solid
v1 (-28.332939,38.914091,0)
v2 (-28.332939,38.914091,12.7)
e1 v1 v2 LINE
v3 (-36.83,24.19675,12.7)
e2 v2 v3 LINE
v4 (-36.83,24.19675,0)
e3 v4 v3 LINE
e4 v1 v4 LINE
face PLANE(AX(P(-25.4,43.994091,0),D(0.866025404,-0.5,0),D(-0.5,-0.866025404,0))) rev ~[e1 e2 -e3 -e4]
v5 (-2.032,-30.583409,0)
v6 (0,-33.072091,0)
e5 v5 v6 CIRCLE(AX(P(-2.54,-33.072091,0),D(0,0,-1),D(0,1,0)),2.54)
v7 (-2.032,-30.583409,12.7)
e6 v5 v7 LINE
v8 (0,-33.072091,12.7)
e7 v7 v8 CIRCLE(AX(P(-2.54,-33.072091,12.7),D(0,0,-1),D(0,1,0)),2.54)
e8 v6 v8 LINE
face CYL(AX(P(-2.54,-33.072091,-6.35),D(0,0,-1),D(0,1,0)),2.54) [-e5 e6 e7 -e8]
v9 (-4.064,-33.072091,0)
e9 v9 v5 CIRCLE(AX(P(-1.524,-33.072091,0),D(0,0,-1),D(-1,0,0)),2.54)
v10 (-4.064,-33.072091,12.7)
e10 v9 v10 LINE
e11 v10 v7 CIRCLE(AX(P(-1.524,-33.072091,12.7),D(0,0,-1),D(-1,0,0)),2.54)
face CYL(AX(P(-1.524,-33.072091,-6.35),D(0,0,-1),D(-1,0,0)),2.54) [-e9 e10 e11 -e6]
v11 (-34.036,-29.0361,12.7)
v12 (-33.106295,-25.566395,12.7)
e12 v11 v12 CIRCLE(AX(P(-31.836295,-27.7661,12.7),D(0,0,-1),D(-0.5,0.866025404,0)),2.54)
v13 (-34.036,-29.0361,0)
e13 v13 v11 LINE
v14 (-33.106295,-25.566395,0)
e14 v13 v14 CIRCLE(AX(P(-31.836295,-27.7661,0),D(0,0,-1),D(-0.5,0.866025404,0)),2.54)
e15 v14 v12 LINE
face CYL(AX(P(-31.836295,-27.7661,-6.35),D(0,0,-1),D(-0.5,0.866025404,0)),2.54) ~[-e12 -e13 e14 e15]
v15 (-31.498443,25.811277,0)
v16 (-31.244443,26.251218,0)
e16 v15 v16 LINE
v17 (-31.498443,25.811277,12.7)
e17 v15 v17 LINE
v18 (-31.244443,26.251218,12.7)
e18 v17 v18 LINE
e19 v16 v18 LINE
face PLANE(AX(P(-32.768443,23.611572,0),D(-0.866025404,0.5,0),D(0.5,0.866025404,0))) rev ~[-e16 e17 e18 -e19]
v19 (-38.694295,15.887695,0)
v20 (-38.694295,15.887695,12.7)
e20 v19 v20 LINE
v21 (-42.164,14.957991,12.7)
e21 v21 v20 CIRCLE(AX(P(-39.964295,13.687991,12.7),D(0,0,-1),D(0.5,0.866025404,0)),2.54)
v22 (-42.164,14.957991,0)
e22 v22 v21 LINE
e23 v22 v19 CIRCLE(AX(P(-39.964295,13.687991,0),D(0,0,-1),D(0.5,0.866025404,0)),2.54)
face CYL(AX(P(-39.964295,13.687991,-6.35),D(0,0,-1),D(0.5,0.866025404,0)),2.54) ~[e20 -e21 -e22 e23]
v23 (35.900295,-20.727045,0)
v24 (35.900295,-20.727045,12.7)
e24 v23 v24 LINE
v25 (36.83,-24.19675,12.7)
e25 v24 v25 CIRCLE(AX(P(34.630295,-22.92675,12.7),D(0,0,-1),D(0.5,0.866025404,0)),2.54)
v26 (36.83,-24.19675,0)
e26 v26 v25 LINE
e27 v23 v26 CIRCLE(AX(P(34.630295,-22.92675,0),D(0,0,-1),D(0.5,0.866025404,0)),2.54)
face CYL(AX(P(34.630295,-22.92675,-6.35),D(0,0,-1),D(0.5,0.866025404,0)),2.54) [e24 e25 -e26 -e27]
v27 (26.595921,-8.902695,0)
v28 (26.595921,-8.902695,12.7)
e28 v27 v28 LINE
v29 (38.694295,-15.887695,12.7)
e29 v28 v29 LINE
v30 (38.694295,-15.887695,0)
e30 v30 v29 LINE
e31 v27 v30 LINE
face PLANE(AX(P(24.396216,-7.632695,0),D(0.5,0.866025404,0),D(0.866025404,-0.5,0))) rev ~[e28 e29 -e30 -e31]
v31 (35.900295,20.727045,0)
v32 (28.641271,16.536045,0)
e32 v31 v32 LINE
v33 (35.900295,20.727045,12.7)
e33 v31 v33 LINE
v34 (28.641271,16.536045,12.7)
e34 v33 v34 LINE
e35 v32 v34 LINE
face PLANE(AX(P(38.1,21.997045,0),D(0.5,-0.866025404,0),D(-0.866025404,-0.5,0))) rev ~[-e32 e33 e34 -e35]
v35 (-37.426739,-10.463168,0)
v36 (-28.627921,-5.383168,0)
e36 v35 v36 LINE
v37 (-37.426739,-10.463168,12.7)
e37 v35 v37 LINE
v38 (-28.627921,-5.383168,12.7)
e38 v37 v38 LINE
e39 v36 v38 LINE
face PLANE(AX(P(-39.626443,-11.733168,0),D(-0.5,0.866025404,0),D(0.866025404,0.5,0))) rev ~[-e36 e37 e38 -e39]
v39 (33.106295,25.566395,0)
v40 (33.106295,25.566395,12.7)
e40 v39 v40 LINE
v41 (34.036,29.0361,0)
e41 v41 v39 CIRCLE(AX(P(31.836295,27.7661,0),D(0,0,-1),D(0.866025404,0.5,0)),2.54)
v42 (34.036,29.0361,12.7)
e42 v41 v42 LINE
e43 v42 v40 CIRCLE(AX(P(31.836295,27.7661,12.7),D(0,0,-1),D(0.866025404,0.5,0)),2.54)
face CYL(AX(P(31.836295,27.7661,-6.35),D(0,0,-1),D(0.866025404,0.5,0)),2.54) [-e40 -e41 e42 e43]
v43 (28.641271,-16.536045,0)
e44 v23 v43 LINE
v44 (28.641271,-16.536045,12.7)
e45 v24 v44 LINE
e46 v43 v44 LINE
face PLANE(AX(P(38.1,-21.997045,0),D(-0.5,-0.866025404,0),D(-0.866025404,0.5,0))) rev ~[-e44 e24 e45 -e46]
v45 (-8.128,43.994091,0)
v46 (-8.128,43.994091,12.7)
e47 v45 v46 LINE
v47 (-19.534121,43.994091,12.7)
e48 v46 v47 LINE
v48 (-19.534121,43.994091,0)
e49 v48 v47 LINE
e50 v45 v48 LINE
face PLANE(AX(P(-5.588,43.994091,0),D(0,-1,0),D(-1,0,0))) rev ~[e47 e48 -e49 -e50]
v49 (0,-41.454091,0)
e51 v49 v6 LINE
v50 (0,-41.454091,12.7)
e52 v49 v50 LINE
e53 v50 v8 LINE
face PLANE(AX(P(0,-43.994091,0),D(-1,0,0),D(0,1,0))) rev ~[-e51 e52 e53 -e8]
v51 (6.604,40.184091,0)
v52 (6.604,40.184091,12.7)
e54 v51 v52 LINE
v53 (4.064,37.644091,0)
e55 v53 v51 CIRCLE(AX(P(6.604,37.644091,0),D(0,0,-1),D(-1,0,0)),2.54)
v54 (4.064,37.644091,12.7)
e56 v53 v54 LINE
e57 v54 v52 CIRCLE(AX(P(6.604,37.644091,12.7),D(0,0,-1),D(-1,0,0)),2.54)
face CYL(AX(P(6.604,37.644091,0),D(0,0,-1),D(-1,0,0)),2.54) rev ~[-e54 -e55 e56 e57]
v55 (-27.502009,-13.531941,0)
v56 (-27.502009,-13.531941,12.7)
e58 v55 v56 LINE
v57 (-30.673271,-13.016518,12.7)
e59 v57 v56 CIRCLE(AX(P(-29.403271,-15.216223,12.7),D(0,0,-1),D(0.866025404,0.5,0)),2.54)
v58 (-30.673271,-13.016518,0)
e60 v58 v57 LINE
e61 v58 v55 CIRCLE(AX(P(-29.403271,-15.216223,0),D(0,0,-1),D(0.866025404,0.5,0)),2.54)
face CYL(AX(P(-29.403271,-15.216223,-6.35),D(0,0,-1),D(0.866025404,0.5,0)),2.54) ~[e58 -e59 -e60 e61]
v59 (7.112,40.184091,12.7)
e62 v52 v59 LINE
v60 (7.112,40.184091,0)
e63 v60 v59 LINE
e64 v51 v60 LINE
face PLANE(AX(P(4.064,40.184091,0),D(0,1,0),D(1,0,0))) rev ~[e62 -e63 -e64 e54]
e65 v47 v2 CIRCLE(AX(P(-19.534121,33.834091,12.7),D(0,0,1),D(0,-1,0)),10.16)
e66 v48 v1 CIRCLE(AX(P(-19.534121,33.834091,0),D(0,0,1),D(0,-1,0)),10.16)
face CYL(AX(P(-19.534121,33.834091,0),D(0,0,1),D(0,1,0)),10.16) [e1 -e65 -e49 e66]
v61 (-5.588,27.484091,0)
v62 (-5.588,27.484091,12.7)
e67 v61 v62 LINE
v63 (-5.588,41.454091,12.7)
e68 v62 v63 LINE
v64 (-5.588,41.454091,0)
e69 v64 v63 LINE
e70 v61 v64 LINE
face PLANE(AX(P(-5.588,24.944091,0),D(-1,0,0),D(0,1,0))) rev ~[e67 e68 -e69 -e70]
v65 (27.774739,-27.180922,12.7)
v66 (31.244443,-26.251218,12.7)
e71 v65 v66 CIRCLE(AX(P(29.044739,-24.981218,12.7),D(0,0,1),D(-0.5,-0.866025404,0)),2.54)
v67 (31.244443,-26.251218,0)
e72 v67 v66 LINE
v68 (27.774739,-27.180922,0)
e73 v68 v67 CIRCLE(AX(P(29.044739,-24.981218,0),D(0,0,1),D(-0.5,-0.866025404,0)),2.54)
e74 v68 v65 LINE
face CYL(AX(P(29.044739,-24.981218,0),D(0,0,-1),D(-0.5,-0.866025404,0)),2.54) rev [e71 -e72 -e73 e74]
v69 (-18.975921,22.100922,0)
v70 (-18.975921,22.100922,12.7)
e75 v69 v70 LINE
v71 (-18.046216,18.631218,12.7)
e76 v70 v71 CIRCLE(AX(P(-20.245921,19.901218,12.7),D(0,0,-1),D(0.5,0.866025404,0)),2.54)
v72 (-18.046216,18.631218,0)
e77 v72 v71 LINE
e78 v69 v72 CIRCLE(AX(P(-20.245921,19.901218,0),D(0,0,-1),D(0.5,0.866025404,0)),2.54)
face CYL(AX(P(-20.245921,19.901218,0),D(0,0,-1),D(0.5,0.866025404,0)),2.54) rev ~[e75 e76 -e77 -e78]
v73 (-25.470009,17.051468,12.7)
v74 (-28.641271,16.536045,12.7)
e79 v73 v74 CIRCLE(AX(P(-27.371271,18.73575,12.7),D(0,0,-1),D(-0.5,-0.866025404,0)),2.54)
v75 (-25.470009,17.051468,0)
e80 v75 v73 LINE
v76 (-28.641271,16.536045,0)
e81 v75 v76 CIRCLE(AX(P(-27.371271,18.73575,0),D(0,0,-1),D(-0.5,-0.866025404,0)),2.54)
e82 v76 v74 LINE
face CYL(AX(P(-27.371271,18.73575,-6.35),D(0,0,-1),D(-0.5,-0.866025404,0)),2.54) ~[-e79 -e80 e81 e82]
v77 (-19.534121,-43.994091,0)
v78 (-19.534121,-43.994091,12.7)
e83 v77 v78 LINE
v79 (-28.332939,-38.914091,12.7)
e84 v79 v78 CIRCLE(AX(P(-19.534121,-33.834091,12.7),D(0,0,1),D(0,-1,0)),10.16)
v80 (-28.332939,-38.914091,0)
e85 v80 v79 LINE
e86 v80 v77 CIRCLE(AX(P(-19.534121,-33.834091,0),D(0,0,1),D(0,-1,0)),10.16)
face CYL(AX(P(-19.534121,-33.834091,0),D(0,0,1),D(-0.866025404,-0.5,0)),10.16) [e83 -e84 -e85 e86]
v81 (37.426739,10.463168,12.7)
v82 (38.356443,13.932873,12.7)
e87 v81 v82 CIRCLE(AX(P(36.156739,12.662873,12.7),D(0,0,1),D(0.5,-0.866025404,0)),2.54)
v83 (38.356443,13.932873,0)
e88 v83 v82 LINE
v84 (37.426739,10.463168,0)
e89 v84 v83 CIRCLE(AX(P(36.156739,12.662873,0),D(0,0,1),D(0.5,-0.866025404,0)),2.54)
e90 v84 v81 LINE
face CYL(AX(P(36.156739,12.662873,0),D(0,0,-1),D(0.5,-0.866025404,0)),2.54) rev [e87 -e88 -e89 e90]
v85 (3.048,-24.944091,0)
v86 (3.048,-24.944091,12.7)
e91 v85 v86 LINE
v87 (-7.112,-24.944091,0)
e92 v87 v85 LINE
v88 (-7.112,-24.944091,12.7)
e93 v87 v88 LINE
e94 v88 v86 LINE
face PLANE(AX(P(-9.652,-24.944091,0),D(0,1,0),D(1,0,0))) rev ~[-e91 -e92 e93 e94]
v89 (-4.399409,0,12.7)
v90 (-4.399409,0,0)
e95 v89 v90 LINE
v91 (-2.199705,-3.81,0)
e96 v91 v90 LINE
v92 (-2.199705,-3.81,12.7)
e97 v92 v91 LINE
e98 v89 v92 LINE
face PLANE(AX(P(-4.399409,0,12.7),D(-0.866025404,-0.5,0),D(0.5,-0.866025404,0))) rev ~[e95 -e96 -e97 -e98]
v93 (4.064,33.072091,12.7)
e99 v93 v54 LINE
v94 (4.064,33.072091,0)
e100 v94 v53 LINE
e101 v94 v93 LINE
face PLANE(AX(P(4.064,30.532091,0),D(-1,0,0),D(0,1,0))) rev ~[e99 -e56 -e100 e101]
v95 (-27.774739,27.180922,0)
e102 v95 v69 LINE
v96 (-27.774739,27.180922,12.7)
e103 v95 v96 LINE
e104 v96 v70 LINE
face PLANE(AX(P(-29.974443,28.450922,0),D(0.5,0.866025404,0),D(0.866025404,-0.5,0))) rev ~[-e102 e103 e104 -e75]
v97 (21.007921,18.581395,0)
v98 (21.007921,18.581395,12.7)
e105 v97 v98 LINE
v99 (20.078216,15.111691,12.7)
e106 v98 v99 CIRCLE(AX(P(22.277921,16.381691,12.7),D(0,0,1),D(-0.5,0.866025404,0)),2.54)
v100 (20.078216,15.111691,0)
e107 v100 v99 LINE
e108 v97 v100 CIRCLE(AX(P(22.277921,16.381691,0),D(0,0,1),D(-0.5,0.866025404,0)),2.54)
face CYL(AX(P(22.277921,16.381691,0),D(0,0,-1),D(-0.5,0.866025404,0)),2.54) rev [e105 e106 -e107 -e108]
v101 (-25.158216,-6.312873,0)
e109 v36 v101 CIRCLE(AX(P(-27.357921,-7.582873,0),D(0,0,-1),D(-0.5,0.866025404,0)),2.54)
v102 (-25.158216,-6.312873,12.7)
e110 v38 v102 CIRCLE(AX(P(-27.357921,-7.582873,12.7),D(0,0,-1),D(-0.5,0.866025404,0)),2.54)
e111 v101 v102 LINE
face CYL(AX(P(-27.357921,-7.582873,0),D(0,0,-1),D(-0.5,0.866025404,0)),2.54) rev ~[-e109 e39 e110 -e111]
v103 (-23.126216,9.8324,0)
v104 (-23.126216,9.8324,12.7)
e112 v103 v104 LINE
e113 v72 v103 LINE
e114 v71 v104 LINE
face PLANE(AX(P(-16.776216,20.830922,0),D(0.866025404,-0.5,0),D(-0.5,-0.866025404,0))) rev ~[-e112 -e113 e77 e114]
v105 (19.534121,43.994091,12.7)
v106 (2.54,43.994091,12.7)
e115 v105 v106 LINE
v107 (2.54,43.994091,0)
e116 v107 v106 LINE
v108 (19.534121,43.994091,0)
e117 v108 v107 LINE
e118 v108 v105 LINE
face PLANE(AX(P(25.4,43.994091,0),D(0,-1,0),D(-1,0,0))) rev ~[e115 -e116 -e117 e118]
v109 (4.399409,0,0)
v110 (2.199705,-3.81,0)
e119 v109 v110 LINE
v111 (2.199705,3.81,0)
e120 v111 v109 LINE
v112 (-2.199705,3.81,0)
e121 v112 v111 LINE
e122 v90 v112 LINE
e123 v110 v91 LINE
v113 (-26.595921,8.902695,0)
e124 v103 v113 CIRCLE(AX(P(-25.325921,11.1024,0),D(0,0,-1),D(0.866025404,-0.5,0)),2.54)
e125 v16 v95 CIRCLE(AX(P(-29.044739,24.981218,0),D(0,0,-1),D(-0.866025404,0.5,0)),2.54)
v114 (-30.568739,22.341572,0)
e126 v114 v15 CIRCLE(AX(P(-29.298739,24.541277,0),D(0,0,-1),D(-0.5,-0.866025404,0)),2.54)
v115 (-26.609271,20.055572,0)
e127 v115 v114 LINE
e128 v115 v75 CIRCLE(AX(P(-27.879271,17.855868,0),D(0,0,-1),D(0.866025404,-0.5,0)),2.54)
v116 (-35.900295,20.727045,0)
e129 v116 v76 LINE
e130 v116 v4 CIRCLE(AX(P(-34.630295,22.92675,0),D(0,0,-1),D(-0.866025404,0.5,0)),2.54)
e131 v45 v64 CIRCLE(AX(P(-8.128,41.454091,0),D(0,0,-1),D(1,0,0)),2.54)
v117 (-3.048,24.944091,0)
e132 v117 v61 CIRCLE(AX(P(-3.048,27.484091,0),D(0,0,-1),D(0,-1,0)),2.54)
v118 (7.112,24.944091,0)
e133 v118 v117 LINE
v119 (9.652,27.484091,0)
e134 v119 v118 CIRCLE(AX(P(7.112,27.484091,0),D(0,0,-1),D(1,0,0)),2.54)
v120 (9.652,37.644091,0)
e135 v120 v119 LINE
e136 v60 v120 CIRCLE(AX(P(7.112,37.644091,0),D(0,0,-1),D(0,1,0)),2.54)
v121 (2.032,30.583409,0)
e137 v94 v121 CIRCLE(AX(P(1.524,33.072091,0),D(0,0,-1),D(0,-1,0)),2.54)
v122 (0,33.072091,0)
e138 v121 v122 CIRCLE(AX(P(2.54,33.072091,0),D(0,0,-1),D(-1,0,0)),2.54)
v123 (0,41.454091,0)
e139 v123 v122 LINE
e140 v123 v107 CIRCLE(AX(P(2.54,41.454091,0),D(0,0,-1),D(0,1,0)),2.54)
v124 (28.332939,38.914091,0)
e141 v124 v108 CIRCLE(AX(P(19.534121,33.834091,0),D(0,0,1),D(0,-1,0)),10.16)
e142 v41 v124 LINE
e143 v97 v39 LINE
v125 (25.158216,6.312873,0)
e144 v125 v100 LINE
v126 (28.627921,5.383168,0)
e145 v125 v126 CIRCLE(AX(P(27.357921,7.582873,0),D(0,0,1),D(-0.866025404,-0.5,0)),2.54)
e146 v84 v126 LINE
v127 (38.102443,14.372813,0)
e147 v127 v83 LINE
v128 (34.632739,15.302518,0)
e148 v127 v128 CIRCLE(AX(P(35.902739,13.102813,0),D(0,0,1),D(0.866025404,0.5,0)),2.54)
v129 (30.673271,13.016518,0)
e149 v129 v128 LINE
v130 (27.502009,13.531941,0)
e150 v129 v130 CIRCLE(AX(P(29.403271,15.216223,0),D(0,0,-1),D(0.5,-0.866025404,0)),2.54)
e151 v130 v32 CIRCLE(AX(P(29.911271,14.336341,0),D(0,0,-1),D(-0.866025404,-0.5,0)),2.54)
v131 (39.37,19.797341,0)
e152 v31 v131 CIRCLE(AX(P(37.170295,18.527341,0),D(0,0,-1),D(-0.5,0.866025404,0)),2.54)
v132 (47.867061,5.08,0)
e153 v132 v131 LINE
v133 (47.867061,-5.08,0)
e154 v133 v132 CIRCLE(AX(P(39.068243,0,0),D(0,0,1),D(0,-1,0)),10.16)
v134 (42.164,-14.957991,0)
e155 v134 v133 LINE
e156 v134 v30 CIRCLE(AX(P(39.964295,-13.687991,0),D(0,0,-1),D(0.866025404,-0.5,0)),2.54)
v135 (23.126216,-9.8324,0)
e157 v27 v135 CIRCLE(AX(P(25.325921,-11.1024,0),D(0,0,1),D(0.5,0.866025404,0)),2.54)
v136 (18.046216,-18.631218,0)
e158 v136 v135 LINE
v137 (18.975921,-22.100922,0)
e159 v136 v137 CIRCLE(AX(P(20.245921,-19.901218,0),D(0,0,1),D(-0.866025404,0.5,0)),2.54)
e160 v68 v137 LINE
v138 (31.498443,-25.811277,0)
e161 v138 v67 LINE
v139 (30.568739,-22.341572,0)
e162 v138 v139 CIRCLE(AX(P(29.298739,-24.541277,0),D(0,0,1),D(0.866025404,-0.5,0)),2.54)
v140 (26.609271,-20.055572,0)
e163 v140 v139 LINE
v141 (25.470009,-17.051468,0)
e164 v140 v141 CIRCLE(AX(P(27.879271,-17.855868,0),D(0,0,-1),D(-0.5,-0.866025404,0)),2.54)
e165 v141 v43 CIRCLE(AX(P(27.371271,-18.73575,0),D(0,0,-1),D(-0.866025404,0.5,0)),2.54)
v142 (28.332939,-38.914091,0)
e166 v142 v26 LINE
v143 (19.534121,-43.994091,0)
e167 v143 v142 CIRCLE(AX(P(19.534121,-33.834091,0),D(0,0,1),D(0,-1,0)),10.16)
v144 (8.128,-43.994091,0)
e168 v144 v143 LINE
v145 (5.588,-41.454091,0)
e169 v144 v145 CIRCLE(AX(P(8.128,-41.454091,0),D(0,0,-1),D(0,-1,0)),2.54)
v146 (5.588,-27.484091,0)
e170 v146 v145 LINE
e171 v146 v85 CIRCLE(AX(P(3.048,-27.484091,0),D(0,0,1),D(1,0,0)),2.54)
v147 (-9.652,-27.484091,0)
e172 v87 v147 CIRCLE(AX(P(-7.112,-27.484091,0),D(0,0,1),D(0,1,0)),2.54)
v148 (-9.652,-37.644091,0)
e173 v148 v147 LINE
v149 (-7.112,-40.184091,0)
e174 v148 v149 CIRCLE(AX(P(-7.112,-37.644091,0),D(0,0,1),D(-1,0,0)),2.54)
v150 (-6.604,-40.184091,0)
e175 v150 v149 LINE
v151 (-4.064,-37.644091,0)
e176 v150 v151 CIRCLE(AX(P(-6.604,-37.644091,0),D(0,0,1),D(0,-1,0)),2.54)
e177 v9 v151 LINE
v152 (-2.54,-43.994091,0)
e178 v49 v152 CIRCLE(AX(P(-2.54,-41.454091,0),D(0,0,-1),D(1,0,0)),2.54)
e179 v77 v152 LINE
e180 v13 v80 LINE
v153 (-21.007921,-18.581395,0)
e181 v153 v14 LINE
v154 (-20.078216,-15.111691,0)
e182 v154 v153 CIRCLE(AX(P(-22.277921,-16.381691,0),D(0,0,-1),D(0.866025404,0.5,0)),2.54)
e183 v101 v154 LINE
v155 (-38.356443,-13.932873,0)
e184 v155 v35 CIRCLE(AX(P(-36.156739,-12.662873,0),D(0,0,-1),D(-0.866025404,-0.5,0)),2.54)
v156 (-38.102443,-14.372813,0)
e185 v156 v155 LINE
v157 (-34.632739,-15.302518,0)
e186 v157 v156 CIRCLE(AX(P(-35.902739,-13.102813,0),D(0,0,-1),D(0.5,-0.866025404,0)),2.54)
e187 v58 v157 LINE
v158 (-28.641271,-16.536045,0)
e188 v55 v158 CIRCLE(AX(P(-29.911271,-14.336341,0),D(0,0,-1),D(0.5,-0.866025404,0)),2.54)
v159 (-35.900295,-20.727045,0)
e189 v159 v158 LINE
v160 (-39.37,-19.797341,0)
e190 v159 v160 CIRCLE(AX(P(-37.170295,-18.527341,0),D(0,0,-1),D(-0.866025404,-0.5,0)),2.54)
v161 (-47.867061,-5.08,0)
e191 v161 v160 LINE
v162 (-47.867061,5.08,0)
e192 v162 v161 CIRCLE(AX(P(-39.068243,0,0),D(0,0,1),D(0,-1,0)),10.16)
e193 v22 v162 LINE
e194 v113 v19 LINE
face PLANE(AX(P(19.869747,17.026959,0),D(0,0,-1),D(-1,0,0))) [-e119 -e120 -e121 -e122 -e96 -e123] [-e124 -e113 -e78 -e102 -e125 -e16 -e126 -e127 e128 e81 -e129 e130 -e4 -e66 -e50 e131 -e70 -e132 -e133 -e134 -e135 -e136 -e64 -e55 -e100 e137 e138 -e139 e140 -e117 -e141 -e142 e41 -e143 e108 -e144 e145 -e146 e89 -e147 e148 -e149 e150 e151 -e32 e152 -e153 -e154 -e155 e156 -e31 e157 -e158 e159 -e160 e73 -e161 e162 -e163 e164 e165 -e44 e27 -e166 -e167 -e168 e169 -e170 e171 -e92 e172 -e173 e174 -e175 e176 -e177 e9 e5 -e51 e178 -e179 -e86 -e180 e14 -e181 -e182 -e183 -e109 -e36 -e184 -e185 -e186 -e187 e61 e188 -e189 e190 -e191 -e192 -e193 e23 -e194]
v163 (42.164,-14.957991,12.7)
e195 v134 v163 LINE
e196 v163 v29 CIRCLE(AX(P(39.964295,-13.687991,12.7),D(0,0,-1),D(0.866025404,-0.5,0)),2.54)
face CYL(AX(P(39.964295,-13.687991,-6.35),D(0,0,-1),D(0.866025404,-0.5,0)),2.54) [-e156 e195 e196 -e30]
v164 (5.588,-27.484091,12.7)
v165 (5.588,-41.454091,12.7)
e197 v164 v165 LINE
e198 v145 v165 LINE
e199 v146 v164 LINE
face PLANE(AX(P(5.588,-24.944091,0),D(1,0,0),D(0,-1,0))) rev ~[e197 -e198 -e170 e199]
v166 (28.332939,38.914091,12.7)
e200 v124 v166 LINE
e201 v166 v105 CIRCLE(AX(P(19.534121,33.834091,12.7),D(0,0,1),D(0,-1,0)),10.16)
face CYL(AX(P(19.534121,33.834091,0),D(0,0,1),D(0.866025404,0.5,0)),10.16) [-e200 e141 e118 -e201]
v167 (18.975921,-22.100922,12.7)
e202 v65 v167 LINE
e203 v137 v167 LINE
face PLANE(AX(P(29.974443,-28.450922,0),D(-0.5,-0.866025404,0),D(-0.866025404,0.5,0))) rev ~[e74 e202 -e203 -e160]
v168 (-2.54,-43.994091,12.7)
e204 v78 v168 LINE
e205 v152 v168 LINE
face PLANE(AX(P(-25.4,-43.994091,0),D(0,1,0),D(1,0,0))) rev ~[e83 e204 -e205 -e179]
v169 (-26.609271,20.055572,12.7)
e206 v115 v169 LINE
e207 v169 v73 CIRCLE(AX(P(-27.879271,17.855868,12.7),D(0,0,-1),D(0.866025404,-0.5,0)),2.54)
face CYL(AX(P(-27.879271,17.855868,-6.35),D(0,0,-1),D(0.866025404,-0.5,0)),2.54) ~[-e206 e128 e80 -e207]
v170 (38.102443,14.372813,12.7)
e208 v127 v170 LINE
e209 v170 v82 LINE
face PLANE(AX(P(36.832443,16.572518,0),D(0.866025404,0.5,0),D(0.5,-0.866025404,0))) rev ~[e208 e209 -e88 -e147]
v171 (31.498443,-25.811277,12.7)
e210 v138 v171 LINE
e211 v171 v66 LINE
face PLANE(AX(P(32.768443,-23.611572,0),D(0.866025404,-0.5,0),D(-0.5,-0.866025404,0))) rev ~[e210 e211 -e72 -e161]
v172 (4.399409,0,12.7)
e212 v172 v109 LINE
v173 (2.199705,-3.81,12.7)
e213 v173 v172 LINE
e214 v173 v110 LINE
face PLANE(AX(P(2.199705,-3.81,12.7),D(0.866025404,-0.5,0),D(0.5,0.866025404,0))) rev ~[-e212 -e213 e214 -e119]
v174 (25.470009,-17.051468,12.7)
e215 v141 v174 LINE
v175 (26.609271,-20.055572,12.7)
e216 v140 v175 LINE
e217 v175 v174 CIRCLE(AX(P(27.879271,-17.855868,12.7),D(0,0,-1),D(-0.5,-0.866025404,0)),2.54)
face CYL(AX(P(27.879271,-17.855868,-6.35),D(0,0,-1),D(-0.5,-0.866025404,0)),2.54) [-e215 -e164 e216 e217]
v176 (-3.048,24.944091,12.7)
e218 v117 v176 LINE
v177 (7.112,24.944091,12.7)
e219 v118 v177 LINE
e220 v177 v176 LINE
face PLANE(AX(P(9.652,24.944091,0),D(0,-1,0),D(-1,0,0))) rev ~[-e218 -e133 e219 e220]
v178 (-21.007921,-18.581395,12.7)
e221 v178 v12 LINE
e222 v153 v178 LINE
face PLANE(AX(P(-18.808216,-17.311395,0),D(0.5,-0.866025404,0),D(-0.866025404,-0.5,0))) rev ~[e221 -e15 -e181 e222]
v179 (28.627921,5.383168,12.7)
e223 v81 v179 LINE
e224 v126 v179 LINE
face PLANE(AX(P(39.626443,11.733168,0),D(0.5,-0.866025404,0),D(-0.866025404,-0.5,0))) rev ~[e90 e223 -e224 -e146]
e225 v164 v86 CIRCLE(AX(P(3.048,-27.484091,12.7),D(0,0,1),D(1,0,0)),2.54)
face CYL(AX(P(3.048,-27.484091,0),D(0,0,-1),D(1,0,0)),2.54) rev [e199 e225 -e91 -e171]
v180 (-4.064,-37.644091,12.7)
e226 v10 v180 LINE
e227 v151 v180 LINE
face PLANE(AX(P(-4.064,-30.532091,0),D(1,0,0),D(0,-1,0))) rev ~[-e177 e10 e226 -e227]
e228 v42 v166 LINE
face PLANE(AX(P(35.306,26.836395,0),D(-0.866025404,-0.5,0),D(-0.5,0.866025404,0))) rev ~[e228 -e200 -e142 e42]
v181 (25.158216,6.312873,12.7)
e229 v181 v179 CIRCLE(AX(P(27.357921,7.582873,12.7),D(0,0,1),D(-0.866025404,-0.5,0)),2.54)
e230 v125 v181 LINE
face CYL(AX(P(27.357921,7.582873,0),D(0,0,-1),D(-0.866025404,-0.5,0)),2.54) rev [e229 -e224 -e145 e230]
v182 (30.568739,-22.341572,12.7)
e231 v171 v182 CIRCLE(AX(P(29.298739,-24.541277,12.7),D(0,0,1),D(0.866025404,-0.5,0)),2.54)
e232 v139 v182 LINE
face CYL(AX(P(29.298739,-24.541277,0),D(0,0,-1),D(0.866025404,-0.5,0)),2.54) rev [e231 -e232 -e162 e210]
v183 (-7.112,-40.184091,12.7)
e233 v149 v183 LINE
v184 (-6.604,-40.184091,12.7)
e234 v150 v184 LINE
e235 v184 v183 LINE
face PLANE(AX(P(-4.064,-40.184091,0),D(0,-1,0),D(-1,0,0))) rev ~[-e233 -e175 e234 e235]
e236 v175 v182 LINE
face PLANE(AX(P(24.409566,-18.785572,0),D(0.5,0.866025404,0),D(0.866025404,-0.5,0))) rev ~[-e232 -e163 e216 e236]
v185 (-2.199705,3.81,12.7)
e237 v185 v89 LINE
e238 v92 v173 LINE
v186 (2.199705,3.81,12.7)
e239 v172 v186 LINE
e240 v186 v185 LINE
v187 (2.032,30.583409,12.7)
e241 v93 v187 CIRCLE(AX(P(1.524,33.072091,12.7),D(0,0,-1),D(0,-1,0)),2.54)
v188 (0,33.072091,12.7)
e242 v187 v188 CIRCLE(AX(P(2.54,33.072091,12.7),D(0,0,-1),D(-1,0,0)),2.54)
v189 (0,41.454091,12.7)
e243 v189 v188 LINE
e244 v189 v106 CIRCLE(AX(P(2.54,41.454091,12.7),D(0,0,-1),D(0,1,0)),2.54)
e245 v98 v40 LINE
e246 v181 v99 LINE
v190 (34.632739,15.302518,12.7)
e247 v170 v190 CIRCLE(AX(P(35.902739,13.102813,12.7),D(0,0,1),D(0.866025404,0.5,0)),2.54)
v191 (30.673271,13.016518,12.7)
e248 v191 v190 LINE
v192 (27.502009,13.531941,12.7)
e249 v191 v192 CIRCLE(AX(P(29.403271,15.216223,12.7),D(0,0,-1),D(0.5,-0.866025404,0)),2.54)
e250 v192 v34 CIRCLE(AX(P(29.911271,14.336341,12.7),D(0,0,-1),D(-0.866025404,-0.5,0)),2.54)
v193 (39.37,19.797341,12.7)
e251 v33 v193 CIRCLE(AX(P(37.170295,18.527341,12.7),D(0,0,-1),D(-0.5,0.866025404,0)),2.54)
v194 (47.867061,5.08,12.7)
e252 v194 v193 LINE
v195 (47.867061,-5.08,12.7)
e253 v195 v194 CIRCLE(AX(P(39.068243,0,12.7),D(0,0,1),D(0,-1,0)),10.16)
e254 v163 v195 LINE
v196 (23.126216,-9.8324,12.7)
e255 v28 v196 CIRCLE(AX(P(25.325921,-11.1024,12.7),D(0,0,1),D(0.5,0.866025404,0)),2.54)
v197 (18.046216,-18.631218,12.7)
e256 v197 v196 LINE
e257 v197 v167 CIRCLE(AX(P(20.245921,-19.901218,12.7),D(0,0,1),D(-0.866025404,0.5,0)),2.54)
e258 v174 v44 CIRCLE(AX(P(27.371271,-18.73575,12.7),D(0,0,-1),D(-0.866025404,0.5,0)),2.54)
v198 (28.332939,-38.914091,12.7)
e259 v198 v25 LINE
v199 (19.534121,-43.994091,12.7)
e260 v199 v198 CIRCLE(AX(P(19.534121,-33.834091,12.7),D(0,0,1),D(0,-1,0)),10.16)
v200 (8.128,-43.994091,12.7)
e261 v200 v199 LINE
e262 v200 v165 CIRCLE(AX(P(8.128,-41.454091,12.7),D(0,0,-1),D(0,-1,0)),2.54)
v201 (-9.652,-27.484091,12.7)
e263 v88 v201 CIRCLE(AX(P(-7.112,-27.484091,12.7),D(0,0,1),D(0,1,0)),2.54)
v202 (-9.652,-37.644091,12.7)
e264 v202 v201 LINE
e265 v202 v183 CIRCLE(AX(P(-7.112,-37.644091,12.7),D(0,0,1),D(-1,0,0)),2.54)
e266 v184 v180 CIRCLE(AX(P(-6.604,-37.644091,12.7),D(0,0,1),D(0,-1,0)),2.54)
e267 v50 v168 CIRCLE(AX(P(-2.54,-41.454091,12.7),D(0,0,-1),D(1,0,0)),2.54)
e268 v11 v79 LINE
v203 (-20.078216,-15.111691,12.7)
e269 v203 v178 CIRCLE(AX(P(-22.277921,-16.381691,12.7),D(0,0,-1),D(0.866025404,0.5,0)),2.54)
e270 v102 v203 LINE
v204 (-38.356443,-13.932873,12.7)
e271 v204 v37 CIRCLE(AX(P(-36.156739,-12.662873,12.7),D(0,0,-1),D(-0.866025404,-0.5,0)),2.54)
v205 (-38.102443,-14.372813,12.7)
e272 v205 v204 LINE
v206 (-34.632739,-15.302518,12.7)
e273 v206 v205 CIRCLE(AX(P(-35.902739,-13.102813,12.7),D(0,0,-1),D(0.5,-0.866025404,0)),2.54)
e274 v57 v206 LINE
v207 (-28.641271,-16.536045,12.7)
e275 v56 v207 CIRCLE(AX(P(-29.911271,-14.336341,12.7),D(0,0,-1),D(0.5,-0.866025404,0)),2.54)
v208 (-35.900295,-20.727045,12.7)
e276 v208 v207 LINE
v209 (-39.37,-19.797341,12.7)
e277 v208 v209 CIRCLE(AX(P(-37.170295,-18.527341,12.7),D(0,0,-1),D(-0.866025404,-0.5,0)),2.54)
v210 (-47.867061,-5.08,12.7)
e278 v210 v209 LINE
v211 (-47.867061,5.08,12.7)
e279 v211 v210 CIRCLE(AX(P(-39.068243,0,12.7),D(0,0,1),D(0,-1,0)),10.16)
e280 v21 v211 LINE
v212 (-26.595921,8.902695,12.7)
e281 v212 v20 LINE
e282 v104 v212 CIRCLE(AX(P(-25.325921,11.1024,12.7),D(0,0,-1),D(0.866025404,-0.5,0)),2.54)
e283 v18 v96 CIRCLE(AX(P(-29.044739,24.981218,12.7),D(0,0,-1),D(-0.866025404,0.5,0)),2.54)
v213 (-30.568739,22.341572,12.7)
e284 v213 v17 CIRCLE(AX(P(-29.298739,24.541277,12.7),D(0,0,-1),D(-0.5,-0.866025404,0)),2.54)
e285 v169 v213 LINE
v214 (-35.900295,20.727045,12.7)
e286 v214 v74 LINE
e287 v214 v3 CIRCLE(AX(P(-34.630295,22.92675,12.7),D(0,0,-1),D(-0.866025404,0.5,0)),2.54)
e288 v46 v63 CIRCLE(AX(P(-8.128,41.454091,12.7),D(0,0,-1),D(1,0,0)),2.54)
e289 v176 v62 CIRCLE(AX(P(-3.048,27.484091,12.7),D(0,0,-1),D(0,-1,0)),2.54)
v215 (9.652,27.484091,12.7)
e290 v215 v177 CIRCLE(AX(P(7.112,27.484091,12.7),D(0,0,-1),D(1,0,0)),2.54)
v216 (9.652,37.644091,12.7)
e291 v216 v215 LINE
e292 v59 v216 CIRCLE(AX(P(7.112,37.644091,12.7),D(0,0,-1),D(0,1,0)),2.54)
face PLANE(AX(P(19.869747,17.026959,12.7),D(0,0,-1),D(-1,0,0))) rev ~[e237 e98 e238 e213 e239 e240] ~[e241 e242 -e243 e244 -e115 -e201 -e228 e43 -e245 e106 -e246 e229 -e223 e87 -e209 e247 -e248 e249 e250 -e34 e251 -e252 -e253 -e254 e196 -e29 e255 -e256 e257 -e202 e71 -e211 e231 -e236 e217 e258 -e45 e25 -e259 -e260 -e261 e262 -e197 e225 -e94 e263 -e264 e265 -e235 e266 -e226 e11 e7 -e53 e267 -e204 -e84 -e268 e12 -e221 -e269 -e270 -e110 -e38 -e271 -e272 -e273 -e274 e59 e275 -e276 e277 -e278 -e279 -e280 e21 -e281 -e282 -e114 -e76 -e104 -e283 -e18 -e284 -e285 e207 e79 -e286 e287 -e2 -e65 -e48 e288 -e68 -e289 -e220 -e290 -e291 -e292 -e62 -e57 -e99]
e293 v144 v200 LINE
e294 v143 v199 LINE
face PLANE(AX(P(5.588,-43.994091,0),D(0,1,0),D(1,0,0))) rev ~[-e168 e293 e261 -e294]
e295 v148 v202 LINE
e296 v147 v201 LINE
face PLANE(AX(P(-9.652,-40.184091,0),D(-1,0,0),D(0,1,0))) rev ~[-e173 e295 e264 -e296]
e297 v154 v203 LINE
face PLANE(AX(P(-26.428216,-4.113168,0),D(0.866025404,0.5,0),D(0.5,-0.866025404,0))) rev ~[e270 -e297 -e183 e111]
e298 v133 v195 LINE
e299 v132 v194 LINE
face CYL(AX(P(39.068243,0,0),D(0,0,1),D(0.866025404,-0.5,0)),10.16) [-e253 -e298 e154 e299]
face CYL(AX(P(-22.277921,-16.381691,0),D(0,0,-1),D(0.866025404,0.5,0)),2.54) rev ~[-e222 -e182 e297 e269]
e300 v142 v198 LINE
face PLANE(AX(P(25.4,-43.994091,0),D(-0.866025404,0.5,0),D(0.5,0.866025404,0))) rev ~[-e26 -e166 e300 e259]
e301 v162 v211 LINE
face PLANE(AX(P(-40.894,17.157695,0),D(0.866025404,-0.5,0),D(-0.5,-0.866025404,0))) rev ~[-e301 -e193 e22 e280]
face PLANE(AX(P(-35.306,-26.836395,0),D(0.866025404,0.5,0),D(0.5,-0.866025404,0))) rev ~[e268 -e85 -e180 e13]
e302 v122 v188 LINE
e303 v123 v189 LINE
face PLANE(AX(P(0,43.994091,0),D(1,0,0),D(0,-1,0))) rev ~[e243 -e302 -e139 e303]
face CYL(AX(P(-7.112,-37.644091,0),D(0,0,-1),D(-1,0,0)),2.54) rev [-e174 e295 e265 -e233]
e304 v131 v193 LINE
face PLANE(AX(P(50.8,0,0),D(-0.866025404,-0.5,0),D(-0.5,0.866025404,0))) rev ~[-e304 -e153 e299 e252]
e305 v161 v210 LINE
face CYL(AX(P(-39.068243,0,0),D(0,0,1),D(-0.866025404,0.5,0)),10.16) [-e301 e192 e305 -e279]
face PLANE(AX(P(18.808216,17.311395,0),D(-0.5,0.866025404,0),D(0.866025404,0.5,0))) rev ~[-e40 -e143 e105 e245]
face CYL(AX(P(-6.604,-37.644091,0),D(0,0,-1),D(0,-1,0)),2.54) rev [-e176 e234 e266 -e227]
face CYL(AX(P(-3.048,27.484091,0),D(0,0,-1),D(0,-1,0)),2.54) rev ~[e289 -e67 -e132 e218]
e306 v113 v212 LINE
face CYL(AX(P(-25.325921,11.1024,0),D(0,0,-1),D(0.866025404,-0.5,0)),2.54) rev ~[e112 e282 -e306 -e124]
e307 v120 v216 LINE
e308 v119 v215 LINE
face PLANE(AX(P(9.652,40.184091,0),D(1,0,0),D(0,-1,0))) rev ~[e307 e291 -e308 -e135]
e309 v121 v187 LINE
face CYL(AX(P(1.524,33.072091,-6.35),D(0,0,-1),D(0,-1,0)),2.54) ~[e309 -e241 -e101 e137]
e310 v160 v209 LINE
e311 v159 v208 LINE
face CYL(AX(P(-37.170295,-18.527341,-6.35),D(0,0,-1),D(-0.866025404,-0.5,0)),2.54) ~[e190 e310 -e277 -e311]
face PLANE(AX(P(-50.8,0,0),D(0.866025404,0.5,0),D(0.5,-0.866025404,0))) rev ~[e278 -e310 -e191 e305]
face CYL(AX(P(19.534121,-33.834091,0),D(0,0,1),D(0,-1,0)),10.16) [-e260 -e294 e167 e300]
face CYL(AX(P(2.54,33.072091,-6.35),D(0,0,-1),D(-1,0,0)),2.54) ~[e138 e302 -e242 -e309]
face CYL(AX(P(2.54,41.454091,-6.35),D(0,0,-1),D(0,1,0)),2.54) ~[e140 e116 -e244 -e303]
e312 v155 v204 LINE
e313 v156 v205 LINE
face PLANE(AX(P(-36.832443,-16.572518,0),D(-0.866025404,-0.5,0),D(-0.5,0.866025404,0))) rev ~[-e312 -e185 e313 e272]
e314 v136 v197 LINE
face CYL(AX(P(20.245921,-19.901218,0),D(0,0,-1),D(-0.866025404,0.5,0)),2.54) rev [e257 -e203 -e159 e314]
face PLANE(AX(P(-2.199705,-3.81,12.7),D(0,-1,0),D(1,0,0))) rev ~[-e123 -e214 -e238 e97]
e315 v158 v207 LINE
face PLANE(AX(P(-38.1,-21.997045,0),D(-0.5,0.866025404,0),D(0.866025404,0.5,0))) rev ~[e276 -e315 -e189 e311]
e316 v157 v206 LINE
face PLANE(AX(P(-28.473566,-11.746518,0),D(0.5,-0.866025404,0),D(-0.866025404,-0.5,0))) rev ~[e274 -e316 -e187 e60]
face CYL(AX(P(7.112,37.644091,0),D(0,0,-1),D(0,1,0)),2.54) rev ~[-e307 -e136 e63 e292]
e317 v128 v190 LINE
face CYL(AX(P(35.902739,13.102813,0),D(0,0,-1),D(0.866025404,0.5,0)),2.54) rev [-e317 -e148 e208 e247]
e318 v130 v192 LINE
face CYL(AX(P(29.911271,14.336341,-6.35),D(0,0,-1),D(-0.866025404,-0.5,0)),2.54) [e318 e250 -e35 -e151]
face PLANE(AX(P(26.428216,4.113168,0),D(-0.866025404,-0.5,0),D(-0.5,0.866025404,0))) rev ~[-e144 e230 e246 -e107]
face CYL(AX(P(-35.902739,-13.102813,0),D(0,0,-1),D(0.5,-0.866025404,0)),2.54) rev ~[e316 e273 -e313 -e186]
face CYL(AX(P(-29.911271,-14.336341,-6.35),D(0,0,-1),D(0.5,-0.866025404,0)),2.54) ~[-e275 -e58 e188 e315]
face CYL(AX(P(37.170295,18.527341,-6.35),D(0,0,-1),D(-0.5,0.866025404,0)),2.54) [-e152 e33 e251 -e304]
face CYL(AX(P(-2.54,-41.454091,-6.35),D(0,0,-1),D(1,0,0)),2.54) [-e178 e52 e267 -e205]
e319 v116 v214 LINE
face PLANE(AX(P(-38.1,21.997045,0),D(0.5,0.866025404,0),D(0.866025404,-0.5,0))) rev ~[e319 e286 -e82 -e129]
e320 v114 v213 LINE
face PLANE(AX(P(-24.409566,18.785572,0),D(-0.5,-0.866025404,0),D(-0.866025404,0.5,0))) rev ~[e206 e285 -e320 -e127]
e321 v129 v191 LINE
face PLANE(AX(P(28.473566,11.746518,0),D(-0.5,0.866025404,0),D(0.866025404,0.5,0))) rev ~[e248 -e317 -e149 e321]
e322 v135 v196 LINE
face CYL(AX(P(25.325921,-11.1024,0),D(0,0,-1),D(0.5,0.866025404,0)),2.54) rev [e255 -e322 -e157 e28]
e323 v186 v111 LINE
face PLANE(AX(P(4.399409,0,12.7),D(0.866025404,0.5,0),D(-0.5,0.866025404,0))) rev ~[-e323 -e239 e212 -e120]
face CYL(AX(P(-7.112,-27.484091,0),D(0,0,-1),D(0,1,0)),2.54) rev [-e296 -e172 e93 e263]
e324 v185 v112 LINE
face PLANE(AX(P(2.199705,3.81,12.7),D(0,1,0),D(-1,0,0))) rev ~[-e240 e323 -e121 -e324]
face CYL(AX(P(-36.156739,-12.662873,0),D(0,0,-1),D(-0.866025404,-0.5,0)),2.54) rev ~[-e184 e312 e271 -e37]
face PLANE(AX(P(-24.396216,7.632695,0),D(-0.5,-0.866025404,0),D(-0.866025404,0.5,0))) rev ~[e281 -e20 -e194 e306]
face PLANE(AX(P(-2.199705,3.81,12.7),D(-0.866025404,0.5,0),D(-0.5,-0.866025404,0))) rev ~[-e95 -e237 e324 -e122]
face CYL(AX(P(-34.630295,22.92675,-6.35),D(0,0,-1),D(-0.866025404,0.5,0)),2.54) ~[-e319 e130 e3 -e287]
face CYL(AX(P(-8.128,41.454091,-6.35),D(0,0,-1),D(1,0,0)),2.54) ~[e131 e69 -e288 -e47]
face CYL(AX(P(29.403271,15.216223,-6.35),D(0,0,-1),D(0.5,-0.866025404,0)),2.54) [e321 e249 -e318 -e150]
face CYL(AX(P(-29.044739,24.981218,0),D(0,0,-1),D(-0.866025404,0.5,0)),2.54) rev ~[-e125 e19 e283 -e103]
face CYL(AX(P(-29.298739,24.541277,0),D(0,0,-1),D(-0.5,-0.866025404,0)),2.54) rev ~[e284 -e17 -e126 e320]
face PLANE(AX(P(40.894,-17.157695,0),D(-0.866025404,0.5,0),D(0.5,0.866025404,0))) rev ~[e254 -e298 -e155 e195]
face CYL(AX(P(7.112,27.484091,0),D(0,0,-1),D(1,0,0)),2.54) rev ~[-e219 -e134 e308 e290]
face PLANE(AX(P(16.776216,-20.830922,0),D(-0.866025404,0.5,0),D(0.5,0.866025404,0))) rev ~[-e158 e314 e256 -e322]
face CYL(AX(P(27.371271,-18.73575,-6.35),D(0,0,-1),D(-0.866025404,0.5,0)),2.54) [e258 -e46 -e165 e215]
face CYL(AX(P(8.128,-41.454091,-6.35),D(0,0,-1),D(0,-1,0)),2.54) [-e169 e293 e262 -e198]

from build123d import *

# Parameters (mm, degrees)
F1_DEPTH    = 12.7
F2_R        = 10.16
F3_T1_DEPTH = 12.7
F3_T3_DEPTH = 25.4
F5_DEPTH    = 12.701


# Not quite as in the source:
# - a fillet or chamfer that OpenCascade refuses, or shapes differently, is made with other operations: its cross-section is extruded or revolved along the edge and cut away or added


with BuildPart() as f1:
    # F0 (on Top) → F1 (new body)
    with BuildSketch(Plane.XY):
        Polygon((-5.588, 24.9440905122), (-5.588, 43.9940905122), (-25.4, 43.9940905122), (-38.1, 21.9970452561), (-26.4415660143, 15.2660452561), (-24.4095660143, 18.7855724971), (-32.7684432116, 23.6115724971), (-29.9744432116, 28.4509224535), (-16.7762160579, 20.8309224535), (-24.3962160579, 7.6326952998), (-40.894, 17.1576952998), (-50.8, 0), (-38.1, -21.9970452561), (-26.4415660143, -15.2660452561), (-28.4735660143, -11.7465180151), (-36.8324432116, -16.5725180151), (-39.6264432116, -11.7331680588), (-26.4282160579, -4.1131680588), (-18.8082160579, -17.3113952125), (-35.306, -26.8363952125), (-25.4, -43.9940905122), (0, -43.9940905122), (0, -30.5320905122), (-4.064, -30.5320905122), (-4.064, -40.1840905122), (-9.652, -40.1840905122), (-9.652, -24.9440905122), (5.588, -24.9440905122), (5.588, -43.9940905122), (25.4, -43.9940905122), (38.1, -21.9970452561), (26.4415660143, -15.2660452561), (24.4095660143, -18.7855724971), (32.7684432116, -23.6115724971), (29.9744432116, -28.4509224535), (16.7762160579, -20.8309224535), (24.3962160579, -7.6326952998), (40.894, -17.1576952998), (50.8, 0), (38.1, 21.9970452561), (26.4415660143, 15.2660452561), (28.4735660143, 11.7465180151), (36.8324432116, 16.5725180151), (39.6264432116, 11.7331680588), (26.4282160579, 4.1131680588), (18.8082160579, 17.3113952125), (35.306, 26.8363952125), (25.4, 43.9940905122), (0, 43.9940905122), (0, 30.5320905122), (4.064, 30.5320905122), (4.064, 40.1840905122), (9.652, 40.1840905122), (9.652, 24.9440905122), align=None)
    extrude(amount=F1_DEPTH)

    # F2
    f2_edges = [f1.edges().sort_by_distance(p)[0] for p in [
        (-50.8, 0, 6.35),
        (-25.4, -43.994091, 6.35),
        (25.4, -43.994091, 6.35),
        (50.8, 0, 6.35),
        (25.4, 43.994091, 6.35),
        (-25.4, 43.994091, 6.35),
    ]]
    fillet(f2_edges, radius=F2_R)

    # F3: fillet of radius 2.54 on 48 edges, made by hand

    # F3_s2 → F3_t1 (join)
    with BuildSketch(Plane.XY):
        with BuildLine():
            ThreePointArc((21.0079205835, 18.5813952125), (19.8244689847, 17.0390910614), (20.0782160579, 15.1116906869))
            Line((20.0782160579, 15.1116906869), (18.8082160579, 17.3113952125))
            Line((18.8082160579, 17.3113952125), (21.0079205835, 18.5813952125))
        make_face()
        with BuildLine():
            ThreePointArc((25.1582160579, 6.3128725844), (26.700520209, 5.1294209856), (28.6279205835, 5.3831680588))
            Line((28.6279205835, 5.3831680588), (26.4282160579, 4.1131680588))
            Line((26.4282160579, 4.1131680588), (25.1582160579, 6.3128725844))
        make_face()
        with BuildLine():
            ThreePointArc((37.426738686, 10.4631680588), (38.6101902847, 12.0054722098), (38.3564432116, 13.9328725844))
            Line((38.3564432116, 13.9328725844), (39.6264432116, 11.7331680588))
            Line((39.6264432116, 11.7331680588), (37.426738686, 10.4631680588))
        make_face()
        with BuildLine():
            ThreePointArc((38.1024432116, 14.3728134895), (36.5601390605, 15.5562650883), (34.632738686, 15.3025180151))
            Line((34.632738686, 15.3025180151), (36.8324432116, 16.5725180151))
            Line((36.8324432116, 16.5725180151), (38.1024432116, 14.3728134895))
        make_face()
        with BuildLine():
            ThreePointArc((26.5959205835, -8.9026952998), (24.668520209, -8.6489482266), (23.1262160579, -9.8323998254))
            Line((23.1262160579, -9.8323998254), (24.3962160579, -7.6326952998))
            Line((24.3962160579, -7.6326952998), (26.5959205835, -8.9026952998))
        make_face()
        with BuildLine():
            ThreePointArc((18.0462160579, -18.6312179278), (17.7924689847, -20.5586183024), (18.9759205835, -22.1009224535))
            Line((18.9759205835, -22.1009224535), (16.7762160579, -20.8309224535))
            Line((16.7762160579, -20.8309224535), (18.0462160579, -18.6312179278))
        make_face()
        with BuildLine():
            ThreePointArc((27.774738686, -27.1809224535), (29.7021390605, -27.4346695266), (31.2444432116, -26.2512179278))
            Line((31.2444432116, -26.2512179278), (29.9744432116, -28.4509224535))
            Line((29.9744432116, -28.4509224535), (27.774738686, -27.1809224535))
        make_face()
        with BuildLine():
            ThreePointArc((31.4984432116, -25.8112770227), (31.7521902847, -23.8838766482), (30.568738686, -22.3415724971))
            Line((30.568738686, -22.3415724971), (32.7684432116, -23.6115724971))
            Line((32.7684432116, -23.6115724971), (31.4984432116, -25.8112770227))
        make_face()
        with BuildLine():
            ThreePointArc((5.588, -27.4840905122), (4.8440512242, -25.688039288), (3.048, -24.9440905122))
            Line((3.048, -24.9440905122), (5.588, -24.9440905122))
            Line((5.588, -24.9440905122), (5.588, -27.4840905122))
        make_face()
        with BuildLine():
            ThreePointArc((-7.112, -24.9440905122), (-8.9080512242, -25.688039288), (-9.652, -27.4840905122))
            Line((-9.652, -27.4840905122), (-9.652, -24.9440905122))
            Line((-9.652, -24.9440905122), (-7.112, -24.9440905122))
        make_face()
        with BuildLine():
            ThreePointArc((-9.652, -37.6440905122), (-8.9080512242, -39.4401417365), (-7.112, -40.1840905122))
            Line((-7.112, -40.1840905122), (-9.652, -40.1840905122))
            Line((-9.652, -40.1840905122), (-9.652, -37.6440905122))
        make_face()
        with BuildLine():
            ThreePointArc((-6.604, -40.1840905122), (-4.8079487758, -39.4401417365), (-4.064, -37.6440905122))
            Line((-4.064, -37.6440905122), (-4.064, -40.1840905122))
            Line((-4.064, -40.1840905122), (-6.604, -40.1840905122))
        make_face()
        with BuildLine():
            ThreePointArc((-20.0782160579, -15.1116906869), (-19.8244689847, -17.0390910614), (-21.0079205835, -18.5813952125))
            Line((-21.0079205835, -18.5813952125), (-18.8082160579, -17.3113952125))
            Line((-18.8082160579, -17.3113952125), (-20.0782160579, -15.1116906869))
        make_face()
        with BuildLine():
            ThreePointArc((-28.6279205835, -5.3831680588), (-26.700520209, -5.1294209856), (-25.1582160579, -6.3128725844))
            Line((-25.1582160579, -6.3128725844), (-26.4282160579, -4.1131680588))
            Line((-26.4282160579, -4.1131680588), (-28.6279205835, -5.3831680588))
        make_face()
        with BuildLine():
            ThreePointArc((-38.3564432116, -13.9328725844), (-38.6101902847, -12.0054722098), (-37.426738686, -10.4631680588))
            Line((-37.426738686, -10.4631680588), (-39.6264432116, -11.7331680588))
            Line((-39.6264432116, -11.7331680588), (-38.3564432116, -13.9328725844))
        make_face()
        with BuildLine():
            ThreePointArc((-34.632738686, -15.3025180151), (-36.5601390605, -15.5562650883), (-38.1024432116, -14.3728134895))
            Line((-38.1024432116, -14.3728134895), (-36.8324432116, -16.5725180151))
            Line((-36.8324432116, -16.5725180151), (-34.632738686, -15.3025180151))
        make_face()
        with BuildLine():
            ThreePointArc((-30.568738686, 22.3415724971), (-31.7521902847, 23.8838766482), (-31.4984432116, 25.8112770227))
            Line((-31.4984432116, 25.8112770227), (-32.7684432116, 23.6115724971))
            Line((-32.7684432116, 23.6115724971), (-30.568738686, 22.3415724971))
        make_face()
        with BuildLine():
            ThreePointArc((-23.1262160579, 9.8323998254), (-24.668520209, 8.6489482266), (-26.5959205835, 8.9026952998))
            Line((-26.5959205835, 8.9026952998), (-24.3962160579, 7.6326952998))
            Line((-24.3962160579, 7.6326952998), (-23.1262160579, 9.8323998254))
        make_face()
        with BuildLine():
            ThreePointArc((-18.9759205835, 22.1009224535), (-17.7924689847, 20.5586183024), (-18.0462160579, 18.6312179278))
            Line((-18.0462160579, 18.6312179278), (-16.7762160579, 20.8309224535))
            Line((-16.7762160579, 20.8309224535), (-18.9759205835, 22.1009224535))
        make_face()
        with BuildLine():
            ThreePointArc((-31.2444432116, 26.2512179278), (-29.7021390605, 27.4346695266), (-27.774738686, 27.1809224535))
            Line((-27.774738686, 27.1809224535), (-29.9744432116, 28.4509224535))
            Line((-29.9744432116, 28.4509224535), (-31.2444432116, 26.2512179278))
        make_face()
        with BuildLine():
            ThreePointArc((-3.048, 24.9440905122), (-4.8440512242, 25.688039288), (-5.588, 27.4840905122))
            Line((-5.588, 27.4840905122), (-5.588, 24.9440905122))
            Line((-5.588, 24.9440905122), (-3.048, 24.9440905122))
        make_face()
        with BuildLine():
            ThreePointArc((4.064, 37.6440905122), (4.8079487758, 39.4401417365), (6.604, 40.1840905122))
            Line((6.604, 40.1840905122), (4.064, 40.1840905122))
            Line((4.064, 40.1840905122), (4.064, 37.6440905122))
        make_face()
        with BuildLine():
            ThreePointArc((9.652, 27.4840905122), (8.9080512242, 25.688039288), (7.112, 24.9440905122))
            Line((7.112, 24.9440905122), (9.652, 24.9440905122))
            Line((9.652, 24.9440905122), (9.652, 27.4840905122))
        make_face()
        with BuildLine():
            ThreePointArc((7.112, 40.1840905122), (8.9080512242, 39.4401417365), (9.652, 37.6440905122))
            Line((9.652, 37.6440905122), (9.652, 40.1840905122))
            Line((9.652, 40.1840905122), (7.112, 40.1840905122))
        make_face()
    extrude(amount=F3_T1_DEPTH)

    # F3_s4 → F3_t3 (cut)
    with BuildSketch(Plane.XY.offset(-6.35)):
        with BuildLine():
            ThreePointArc((34.036, 29.0360997381), (34.2897470732, 27.1086993635), (33.1062954744, 25.5663952125))
            Line((33.1062954744, 25.5663952125), (35.306, 26.8363952125))
            Line((35.306, 26.8363952125), (34.036, 29.0360997381))
        make_face()
        with BuildLine():
            ThreePointArc((30.6732705399, 13.0165180151), (28.7458701653, 12.762770942), (27.2035660143, 13.9462225408))
            Line((27.2035660143, 13.9462225408), (28.4735660143, 11.7465180151))
            Line((28.4735660143, 11.7465180151), (30.6732705399, 13.0165180151))
        make_face()
        with BuildLine():
            ThreePointArc((27.7115660143, 13.0663407305), (27.4578189411, 14.9937411051), (28.6412705399, 16.5360452561))
            Line((28.6412705399, 16.5360452561), (26.4415660143, 15.2660452561))
            Line((26.4415660143, 15.2660452561), (27.7115660143, 13.0663407305))
        make_face()
        with BuildLine():
            ThreePointArc((35.9002954744, 20.7270452561), (37.8276958489, 20.9807923293), (39.37, 19.7973407305))
            Line((39.37, 19.7973407305), (38.1, 21.9970452561))
            Line((38.1, 21.9970452561), (35.9002954744, 20.7270452561))
        make_face()
        with BuildLine():
            ThreePointArc((42.164, -14.9579907742), (40.6216958489, -16.1414423729), (38.6942954744, -15.8876952998))
            Line((38.6942954744, -15.8876952998), (40.894, -17.1576952998))
            Line((40.894, -17.1576952998), (42.164, -14.9579907742))
        make_face()
        with BuildLine():
            ThreePointArc((35.9002954744, -20.7270452561), (37.0837470732, -22.2693494072), (36.83, -24.1967497817))
            Line((36.83, -24.1967497817), (38.1, -21.9970452561))
            Line((38.1, -21.9970452561), (35.9002954744, -20.7270452561))
        make_face()
        with BuildLine():
            ThreePointArc((25.1715660143, -17.4657497817), (26.7138701653, -16.282298183), (28.6412705399, -16.5360452561))
            Line((28.6412705399, -16.5360452561), (26.4415660143, -15.2660452561))
            Line((26.4415660143, -15.2660452561), (25.1715660143, -17.4657497817))
        make_face()
        with BuildLine():
            ThreePointArc((26.6092705399, -20.0555724971), (25.4258189411, -18.5132683461), (25.6795660143, -16.5858679715))
            Line((25.6795660143, -16.5858679715), (24.4095660143, -18.7855724971))
            Line((24.4095660143, -18.7855724971), (26.6092705399, -20.0555724971))
        make_face()
        with BuildLine():
            ThreePointArc((8.128, -43.9940905122), (6.3319487758, -43.2501417365), (5.588, -41.4540905122))
            Line((5.588, -41.4540905122), (5.588, -43.9940905122))
            Line((5.588, -43.9940905122), (8.128, -43.9940905122))
        make_face()
        with BuildLine():
            ThreePointArc((0, -41.4540905122), (-0.7439487758, -43.2501417365), (-2.54, -43.9940905122))
            Line((-2.54, -43.9940905122), (0, -43.9940905122))
            Line((0, -43.9940905122), (0, -41.4540905122))
        make_face()
        with BuildLine():
            ThreePointArc((-4.064, -33.0720905122), (-3.3200512242, -31.276039288), (-1.524, -30.5320905122))
            Line((-1.524, -30.5320905122), (-4.064, -30.5320905122))
            Line((-4.064, -30.5320905122), (-4.064, -33.0720905122))
        make_face()
        with BuildLine():
            ThreePointArc((-2.54, -30.5320905122), (-0.7439487758, -31.276039288), (0, -33.0720905122))
            Line((0, -33.0720905122), (0, -30.5320905122))
            Line((0, -30.5320905122), (-2.54, -30.5320905122))
        make_face()
        with BuildLine():
            ThreePointArc((-33.1062954744, -25.5663952125), (-34.2897470732, -27.1086993635), (-34.036, -29.0360997381))
            Line((-34.036, -29.0360997381), (-35.306, -26.8363952125))
            Line((-35.306, -26.8363952125), (-33.1062954744, -25.5663952125))
        make_face()
        with BuildLine():
            ThreePointArc((-27.2035660143, -13.9462225408), (-28.7458701653, -12.762770942), (-30.6732705399, -13.0165180151))
            Line((-30.6732705399, -13.0165180151), (-28.4735660143, -11.7465180151))
            Line((-28.4735660143, -11.7465180151), (-27.2035660143, -13.9462225408))
        make_face()
        with BuildLine():
            ThreePointArc((-28.6412705399, -16.5360452561), (-27.4578189411, -14.9937411051), (-27.7115660143, -13.0663407305))
            Line((-27.7115660143, -13.0663407305), (-26.4415660143, -15.2660452561))
            Line((-26.4415660143, -15.2660452561), (-28.6412705399, -16.5360452561))
        make_face()
        with BuildLine():
            ThreePointArc((-39.37, -19.7973407305), (-37.8276958489, -20.9807923293), (-35.9002954744, -20.7270452561))
            Line((-35.9002954744, -20.7270452561), (-38.1, -21.9970452561))
            Line((-38.1, -21.9970452561), (-39.37, -19.7973407305))
        make_face()
        with BuildLine():
            ThreePointArc((-38.6942954744, 15.8876952998), (-40.6216958489, 16.1414423729), (-42.164, 14.9579907742))
            Line((-42.164, 14.9579907742), (-40.894, 17.1576952998))
            Line((-40.894, 17.1576952998), (-38.6942954744, 15.8876952998))
        make_face()
        with BuildLine():
            ThreePointArc((-36.83, 24.1967497817), (-37.0837470732, 22.2693494072), (-35.9002954744, 20.7270452561))
            Line((-35.9002954744, 20.7270452561), (-38.1, 21.9970452561))
            Line((-38.1, 21.9970452561), (-36.83, 24.1967497817))
        make_face()
        with BuildLine():
            ThreePointArc((-28.6412705399, 16.5360452561), (-26.7138701653, 16.282298183), (-25.1715660143, 17.4657497817))
            Line((-25.1715660143, 17.4657497817), (-26.4415660143, 15.2660452561))
            Line((-26.4415660143, 15.2660452561), (-28.6412705399, 16.5360452561))
        make_face()
        with BuildLine():
            ThreePointArc((-25.6795660143, 16.5858679715), (-25.4258189411, 18.5132683461), (-26.6092705399, 20.0555724971))
            Line((-26.6092705399, 20.0555724971), (-24.4095660143, 18.7855724971))
            Line((-24.4095660143, 18.7855724971), (-25.6795660143, 16.5858679715))
        make_face()
        with BuildLine():
            ThreePointArc((-5.588, 41.4540905122), (-6.3319487758, 43.2501417365), (-8.128, 43.9940905122))
            Line((-8.128, 43.9940905122), (-5.588, 43.9940905122))
            Line((-5.588, 43.9940905122), (-5.588, 41.4540905122))
        make_face()
        with BuildLine():
            ThreePointArc((2.54, 43.9940905122), (0.7439487758, 43.2501417365), (0, 41.4540905122))
            Line((0, 41.4540905122), (0, 43.9940905122))
            Line((0, 43.9940905122), (2.54, 43.9940905122))
        make_face()
        with BuildLine():
            ThreePointArc((0, 33.0720905122), (0.7439487758, 31.276039288), (2.54, 30.5320905122))
            Line((2.54, 30.5320905122), (0, 30.5320905122))
            Line((0, 30.5320905122), (0, 33.0720905122))
        make_face()
        with BuildLine():
            ThreePointArc((1.524, 30.5320905122), (3.3200512242, 31.276039288), (4.064, 33.0720905122))
            Line((4.064, 33.0720905122), (4.064, 30.5320905122))
            Line((4.064, 30.5320905122), (1.524, 30.5320905122))
        make_face()
    extrude(amount=F3_T3_DEPTH, mode=Mode.SUBTRACT)

    # F4 (on face) → F5 (cut, through all)
    with BuildSketch(Plane.XY.offset(12.7)):
        Polygon((2.1997045256, -3.81), (4.3994090512, 0), (2.1997045256, 3.81), (-2.1997045256, 3.81), (-4.3994090512, 0), (-2.1997045256, -3.81), align=None)
    extrude(amount=-F5_DEPTH, mode=Mode.SUBTRACT)


solid = f1.part
